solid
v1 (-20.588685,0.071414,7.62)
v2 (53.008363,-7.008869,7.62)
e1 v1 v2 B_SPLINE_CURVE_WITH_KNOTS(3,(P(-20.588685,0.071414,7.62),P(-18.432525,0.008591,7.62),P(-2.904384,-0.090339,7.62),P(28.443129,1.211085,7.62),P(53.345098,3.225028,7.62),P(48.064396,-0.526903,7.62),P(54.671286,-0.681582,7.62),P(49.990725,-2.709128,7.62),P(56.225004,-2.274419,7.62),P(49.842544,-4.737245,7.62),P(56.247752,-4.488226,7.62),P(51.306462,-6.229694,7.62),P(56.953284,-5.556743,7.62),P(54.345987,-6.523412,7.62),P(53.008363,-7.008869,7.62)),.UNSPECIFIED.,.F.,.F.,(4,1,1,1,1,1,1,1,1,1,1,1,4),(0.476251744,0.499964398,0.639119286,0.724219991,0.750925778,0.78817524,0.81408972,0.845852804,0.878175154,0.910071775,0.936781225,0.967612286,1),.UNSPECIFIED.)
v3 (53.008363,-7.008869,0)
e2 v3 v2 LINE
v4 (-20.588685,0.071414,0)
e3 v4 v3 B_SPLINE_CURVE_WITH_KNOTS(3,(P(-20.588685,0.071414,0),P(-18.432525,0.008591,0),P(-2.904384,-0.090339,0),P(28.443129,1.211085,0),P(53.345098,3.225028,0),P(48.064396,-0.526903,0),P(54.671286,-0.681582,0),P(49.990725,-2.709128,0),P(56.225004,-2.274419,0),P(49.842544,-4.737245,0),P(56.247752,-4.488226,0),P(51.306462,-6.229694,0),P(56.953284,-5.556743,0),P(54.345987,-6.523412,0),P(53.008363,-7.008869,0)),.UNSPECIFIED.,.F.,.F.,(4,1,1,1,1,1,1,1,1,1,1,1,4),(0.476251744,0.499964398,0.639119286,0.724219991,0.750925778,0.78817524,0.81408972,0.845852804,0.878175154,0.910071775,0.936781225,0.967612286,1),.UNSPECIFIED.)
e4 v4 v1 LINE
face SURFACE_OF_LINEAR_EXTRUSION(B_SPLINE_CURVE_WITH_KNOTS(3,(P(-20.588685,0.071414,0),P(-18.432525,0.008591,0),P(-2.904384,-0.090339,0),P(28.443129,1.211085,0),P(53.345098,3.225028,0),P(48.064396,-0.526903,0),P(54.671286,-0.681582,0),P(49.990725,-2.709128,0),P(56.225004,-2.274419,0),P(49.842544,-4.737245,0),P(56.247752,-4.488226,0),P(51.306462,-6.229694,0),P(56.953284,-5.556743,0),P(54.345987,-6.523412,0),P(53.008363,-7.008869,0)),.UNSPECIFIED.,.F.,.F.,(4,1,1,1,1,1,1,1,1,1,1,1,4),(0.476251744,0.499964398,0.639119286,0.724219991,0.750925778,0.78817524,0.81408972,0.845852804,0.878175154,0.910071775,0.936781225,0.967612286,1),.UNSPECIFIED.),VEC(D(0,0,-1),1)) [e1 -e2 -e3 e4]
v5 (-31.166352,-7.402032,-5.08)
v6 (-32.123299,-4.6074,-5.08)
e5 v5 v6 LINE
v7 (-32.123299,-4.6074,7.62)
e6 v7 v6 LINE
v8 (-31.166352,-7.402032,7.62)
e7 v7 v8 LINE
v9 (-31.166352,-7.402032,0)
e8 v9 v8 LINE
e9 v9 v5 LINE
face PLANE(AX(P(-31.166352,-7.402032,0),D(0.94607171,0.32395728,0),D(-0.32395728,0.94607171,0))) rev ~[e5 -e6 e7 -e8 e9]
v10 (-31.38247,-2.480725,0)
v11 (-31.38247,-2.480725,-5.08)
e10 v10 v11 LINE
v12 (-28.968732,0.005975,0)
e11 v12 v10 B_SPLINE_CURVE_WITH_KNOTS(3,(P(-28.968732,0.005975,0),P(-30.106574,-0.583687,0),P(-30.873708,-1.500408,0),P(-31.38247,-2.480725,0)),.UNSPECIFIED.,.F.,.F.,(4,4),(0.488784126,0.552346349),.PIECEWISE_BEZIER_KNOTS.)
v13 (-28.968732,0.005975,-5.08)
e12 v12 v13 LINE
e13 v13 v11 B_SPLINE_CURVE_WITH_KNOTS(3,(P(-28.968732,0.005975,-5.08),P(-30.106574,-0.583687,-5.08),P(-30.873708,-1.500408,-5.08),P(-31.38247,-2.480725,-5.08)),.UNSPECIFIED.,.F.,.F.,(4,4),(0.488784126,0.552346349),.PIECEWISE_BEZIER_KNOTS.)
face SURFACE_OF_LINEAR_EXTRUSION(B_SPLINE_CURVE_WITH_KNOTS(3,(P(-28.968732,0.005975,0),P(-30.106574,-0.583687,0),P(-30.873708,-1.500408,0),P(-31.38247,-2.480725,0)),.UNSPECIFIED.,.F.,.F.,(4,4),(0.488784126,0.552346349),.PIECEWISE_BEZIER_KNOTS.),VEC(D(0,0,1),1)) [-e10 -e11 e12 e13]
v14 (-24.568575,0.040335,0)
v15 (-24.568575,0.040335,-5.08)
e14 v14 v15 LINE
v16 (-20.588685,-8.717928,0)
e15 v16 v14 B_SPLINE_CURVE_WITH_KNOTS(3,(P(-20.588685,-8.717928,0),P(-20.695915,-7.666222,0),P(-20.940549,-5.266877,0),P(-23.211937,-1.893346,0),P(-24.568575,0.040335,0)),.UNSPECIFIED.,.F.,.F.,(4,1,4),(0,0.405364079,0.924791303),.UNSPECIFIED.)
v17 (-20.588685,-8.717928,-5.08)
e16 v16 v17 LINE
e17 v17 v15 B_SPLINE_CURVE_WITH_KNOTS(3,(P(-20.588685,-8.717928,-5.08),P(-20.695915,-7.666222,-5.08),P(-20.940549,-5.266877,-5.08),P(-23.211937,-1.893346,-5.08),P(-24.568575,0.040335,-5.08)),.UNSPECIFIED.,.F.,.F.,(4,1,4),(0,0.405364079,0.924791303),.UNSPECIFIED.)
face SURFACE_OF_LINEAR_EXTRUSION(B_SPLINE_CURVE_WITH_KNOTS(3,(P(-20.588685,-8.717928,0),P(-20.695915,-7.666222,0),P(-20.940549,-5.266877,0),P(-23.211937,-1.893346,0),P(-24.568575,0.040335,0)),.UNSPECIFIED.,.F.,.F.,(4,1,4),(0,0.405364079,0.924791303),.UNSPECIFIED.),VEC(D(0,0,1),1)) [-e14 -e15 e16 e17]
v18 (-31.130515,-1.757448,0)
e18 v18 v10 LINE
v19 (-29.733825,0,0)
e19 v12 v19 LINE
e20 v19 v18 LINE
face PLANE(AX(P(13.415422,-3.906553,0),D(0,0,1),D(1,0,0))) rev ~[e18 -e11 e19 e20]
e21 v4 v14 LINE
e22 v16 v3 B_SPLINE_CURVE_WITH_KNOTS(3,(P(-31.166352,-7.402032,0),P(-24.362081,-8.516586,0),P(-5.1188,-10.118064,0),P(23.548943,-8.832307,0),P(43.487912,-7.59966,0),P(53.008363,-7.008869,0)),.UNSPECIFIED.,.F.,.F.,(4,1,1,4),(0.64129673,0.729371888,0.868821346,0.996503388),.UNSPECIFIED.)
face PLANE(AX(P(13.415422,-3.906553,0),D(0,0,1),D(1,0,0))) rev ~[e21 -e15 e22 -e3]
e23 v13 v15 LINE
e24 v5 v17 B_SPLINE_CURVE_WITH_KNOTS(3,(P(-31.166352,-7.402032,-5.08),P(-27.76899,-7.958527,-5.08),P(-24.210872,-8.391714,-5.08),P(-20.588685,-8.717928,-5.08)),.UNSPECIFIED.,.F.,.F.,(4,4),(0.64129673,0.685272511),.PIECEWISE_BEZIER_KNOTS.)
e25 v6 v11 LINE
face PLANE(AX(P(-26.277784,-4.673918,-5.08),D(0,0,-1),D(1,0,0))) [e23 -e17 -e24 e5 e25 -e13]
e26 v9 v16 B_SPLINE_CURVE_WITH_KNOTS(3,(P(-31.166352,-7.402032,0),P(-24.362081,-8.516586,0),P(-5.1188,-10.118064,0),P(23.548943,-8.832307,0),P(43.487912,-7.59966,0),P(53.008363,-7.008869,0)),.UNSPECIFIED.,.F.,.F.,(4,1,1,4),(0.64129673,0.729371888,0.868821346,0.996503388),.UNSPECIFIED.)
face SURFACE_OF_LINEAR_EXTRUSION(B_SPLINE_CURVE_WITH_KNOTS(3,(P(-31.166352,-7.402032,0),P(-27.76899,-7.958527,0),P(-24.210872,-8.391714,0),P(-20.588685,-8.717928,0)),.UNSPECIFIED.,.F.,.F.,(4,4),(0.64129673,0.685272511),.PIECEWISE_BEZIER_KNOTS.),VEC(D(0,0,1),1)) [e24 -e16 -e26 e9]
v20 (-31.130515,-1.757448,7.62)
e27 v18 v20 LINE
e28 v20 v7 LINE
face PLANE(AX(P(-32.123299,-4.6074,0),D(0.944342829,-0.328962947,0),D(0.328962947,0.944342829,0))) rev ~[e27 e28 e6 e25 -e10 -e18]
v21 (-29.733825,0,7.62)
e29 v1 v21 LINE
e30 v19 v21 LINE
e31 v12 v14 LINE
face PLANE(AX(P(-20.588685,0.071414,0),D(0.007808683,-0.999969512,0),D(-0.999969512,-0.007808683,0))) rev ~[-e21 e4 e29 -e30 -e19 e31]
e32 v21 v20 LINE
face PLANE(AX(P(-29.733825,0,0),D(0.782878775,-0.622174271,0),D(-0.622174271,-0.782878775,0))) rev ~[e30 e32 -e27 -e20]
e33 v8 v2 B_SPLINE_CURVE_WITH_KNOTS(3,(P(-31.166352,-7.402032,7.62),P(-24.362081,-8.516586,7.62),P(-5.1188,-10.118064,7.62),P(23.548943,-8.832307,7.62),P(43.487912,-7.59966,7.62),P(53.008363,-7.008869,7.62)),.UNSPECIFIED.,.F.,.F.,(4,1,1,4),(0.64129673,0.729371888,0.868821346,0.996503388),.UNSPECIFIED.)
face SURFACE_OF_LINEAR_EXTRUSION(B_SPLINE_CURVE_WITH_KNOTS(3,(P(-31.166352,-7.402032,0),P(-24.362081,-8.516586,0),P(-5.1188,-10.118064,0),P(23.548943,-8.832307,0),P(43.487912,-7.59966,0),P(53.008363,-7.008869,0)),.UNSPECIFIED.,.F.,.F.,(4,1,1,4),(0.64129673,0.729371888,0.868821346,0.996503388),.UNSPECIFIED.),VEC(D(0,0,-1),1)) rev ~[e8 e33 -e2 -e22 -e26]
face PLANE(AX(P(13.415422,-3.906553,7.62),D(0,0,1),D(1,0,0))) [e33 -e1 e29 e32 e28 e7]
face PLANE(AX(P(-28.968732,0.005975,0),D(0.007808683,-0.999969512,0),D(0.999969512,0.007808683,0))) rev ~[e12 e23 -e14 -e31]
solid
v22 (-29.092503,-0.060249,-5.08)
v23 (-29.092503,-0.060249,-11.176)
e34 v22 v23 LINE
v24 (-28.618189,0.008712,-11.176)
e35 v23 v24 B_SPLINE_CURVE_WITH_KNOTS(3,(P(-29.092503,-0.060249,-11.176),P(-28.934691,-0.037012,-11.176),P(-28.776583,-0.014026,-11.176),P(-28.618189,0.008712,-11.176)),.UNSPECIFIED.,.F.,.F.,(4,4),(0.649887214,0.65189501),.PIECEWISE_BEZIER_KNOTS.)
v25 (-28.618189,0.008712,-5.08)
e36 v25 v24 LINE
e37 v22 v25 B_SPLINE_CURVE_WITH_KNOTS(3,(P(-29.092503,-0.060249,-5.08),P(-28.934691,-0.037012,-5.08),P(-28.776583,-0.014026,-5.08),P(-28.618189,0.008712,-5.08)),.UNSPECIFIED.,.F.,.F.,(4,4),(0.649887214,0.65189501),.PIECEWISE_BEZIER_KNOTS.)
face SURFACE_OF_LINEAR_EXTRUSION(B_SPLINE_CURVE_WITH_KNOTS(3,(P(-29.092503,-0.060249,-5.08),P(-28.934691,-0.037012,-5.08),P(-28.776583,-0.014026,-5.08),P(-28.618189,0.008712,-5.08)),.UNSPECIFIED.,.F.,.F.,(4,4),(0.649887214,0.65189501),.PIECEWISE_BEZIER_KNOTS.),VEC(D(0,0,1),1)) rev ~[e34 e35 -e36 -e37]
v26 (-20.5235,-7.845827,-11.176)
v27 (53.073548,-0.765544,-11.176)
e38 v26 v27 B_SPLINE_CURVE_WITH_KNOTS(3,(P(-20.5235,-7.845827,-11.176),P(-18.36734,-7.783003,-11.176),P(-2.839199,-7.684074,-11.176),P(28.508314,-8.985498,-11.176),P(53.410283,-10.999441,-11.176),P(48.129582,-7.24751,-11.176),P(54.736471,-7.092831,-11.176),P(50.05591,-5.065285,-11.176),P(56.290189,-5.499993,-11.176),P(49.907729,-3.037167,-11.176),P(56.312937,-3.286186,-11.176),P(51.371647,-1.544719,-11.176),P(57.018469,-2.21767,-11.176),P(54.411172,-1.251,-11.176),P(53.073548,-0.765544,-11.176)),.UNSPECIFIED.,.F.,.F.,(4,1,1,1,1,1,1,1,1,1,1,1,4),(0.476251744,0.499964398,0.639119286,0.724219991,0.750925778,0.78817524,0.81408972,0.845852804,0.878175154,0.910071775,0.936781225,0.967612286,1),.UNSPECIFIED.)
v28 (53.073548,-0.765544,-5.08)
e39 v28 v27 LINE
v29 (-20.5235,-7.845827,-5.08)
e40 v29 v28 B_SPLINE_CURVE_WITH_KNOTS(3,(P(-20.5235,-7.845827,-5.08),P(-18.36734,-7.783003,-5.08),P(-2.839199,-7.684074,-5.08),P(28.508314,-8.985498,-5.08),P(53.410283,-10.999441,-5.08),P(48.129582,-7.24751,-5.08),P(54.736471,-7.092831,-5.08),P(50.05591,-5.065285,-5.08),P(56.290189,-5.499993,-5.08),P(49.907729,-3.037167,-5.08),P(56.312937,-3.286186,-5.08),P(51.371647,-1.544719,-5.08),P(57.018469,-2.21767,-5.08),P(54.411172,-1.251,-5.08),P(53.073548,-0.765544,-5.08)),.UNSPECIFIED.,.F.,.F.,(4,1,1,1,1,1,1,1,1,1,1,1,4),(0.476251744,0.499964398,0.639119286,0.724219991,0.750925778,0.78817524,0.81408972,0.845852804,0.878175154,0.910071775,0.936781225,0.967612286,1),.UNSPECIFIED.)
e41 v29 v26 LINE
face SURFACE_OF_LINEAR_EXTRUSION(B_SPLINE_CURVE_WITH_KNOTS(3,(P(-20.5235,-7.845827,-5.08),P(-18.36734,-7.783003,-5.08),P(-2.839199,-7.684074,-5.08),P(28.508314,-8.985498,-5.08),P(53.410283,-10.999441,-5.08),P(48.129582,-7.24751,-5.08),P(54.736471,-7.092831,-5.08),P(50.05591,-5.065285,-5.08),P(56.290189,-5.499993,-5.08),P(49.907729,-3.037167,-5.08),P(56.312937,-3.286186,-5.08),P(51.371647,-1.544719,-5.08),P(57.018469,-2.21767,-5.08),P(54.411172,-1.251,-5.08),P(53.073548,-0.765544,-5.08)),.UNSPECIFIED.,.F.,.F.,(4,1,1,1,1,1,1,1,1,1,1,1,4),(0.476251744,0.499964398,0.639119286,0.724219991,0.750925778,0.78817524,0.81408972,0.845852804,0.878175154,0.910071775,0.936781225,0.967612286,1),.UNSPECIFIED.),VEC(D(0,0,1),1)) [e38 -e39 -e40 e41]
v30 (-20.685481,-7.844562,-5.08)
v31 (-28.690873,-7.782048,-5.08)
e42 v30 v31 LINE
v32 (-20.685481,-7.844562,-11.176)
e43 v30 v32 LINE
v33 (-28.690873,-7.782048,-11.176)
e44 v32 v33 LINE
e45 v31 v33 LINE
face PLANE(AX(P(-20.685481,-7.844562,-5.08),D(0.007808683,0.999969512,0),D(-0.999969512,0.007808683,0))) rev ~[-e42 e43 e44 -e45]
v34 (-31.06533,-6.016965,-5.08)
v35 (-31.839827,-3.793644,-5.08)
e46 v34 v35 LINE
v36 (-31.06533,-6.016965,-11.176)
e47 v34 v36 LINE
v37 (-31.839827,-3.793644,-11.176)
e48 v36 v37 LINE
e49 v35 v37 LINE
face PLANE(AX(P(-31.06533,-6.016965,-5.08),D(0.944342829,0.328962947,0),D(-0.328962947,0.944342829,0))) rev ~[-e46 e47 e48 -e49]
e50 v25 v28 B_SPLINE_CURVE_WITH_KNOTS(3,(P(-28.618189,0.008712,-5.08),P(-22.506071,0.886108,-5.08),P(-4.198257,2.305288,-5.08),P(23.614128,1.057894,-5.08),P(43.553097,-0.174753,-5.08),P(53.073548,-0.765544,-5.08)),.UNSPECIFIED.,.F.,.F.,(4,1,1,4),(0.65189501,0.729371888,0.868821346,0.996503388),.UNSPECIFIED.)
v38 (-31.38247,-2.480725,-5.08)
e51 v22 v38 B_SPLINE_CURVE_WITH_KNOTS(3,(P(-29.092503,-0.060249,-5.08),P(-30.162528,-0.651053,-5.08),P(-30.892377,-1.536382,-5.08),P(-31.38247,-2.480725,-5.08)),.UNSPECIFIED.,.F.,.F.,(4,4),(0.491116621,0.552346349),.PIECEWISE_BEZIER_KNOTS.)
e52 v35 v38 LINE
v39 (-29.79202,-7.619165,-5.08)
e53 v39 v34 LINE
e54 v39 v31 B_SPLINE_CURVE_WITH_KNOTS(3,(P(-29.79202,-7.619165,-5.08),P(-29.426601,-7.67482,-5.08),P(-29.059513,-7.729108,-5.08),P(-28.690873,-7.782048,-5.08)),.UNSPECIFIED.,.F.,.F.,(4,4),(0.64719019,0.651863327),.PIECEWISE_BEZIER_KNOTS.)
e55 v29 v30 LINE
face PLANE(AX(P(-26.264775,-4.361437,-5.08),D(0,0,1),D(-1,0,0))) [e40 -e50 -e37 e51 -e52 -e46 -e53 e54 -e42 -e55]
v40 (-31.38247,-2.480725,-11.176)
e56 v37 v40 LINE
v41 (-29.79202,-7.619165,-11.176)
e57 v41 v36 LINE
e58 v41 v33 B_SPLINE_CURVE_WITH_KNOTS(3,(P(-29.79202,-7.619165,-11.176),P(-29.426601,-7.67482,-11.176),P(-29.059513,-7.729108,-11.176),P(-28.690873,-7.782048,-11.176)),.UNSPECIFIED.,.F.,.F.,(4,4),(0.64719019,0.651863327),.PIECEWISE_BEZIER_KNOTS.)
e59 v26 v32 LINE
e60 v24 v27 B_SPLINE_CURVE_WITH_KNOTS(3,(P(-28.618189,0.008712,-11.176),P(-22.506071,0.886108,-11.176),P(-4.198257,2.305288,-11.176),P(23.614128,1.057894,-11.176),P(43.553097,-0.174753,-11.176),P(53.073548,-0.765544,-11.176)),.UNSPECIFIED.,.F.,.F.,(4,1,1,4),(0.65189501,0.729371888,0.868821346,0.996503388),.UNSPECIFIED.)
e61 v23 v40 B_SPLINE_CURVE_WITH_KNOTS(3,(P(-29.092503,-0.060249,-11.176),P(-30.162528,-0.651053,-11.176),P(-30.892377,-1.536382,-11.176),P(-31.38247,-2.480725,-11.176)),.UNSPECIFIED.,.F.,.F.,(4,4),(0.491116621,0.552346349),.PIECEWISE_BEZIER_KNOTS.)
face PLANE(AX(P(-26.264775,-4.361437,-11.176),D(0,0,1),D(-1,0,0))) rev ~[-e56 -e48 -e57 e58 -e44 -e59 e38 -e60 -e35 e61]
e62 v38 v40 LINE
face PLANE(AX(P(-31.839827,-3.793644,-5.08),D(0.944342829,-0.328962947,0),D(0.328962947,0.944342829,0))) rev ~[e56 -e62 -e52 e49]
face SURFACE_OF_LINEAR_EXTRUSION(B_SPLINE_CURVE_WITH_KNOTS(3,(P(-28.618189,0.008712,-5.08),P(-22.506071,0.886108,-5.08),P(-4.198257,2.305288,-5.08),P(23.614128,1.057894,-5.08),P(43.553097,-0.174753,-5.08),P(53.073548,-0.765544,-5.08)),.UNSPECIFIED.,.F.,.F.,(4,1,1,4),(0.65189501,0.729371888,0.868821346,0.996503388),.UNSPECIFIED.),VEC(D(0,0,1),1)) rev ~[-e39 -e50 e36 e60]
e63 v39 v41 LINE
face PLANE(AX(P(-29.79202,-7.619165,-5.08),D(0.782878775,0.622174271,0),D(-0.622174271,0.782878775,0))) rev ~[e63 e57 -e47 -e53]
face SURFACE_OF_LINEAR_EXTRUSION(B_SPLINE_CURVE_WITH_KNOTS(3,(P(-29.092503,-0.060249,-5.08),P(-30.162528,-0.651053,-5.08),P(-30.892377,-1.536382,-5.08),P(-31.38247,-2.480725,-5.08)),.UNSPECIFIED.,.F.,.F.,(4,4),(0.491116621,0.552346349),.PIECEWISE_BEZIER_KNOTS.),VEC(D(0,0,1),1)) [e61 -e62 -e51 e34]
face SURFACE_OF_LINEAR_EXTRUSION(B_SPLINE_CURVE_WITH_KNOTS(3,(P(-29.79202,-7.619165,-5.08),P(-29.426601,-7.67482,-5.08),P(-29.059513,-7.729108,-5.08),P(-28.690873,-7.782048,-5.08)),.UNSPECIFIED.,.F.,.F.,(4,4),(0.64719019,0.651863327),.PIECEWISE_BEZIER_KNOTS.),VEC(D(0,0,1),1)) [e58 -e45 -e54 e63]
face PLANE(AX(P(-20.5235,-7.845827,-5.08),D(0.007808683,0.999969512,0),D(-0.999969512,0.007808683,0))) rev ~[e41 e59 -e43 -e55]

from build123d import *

# Parameters (mm, degrees)
F1_DEPTH = 7.62
F3_DEPTH = 5.08
F5_DEPTH = 6.096


with BuildPart() as f1:
    # F0 (on Top) → F1 (new body)
    with BuildSketch(Plane.XY):
        with BuildLine():
            Line((-32.1232994972, -4.6074000446), (-31.1663517222, -7.402031539))
            add(Edge.make_bspline(
                [(-31.1663517222, -7.402031539), (-24.3620805414, -8.516586495), (-5.1188000961, -10.1180637513), (23.5489427366, -8.8323068142), (43.4879123536, -7.5996602354), (53.0083630423, -7.0088685962)],
                knots=[0.6412967297, 0.6412967297, 0.6412967297, 0.6412967297, 0.7293718882, 0.8688213456, 0.9965033878, 0.9965033878, 0.9965033878, 0.9965033878], degree=3))
            add(Edge.make_bspline(
                [(-20.5886847274, 0.0714136867), (-18.4325246492, 0.0085905521), (-2.904384168, -0.0903390189), (28.4431286792, 1.2110854268), (53.3450981726, 3.225027955), (48.0643964884, -0.5269030489), (54.671286243, -0.6815816974), (49.990725038, -2.7091281295), (56.2250035708, -2.2744194982), (49.8425443069, -4.7372453658), (56.2477520114, -4.4882263671), (51.3064623402, -6.2296941136), (56.9532836508, -5.5567427397), (54.34598679, -6.5234124491), (53.0083630423, -7.0088685962)],
                knots=[0.4762517442, 0.4762517442, 0.4762517442, 0.4762517442, 0.4999643977, 0.6391192862, 0.7242199913, 0.7509257777, 0.7881752399, 0.8140897202, 0.8458528044, 0.8781751537, 0.9100717752, 0.9367812247, 0.9676122856, 1, 1, 1, 1], degree=3))
            Line((-20.5886847274, 0.0714136867), (-29.733825475, 0))
            Line((-29.733825475, 0), (-31.1305152205, -1.7574477268))
            Line((-31.1305152205, -1.7574477268), (-32.1232994972, -4.6074000446))
        make_face()
    extrude(amount=F1_DEPTH)

    # F2 (on face) → F3 (join)
    with BuildSketch(Plane(origin=(0, 0, 0), x_dir=(1, 0, 0), z_dir=(0, 0, -1))):
        with BuildLine():
            Line((-31.1663517222, 7.402031539), (-32.1232994972, 4.6074000446))
            Line((-32.1232994972, 4.6074000446), (-31.3824697288, 2.4807250306))
            add(Edge.make_bspline(
                [(-28.9687315599, -0.0059745584), (-30.1065744803, 0.5836866376), (-30.8737077287, 1.5004076818), (-31.3824697288, 2.4807250306)],
                knots=[0.4887841261, 0.4887841261, 0.4887841261, 0.4887841261, 0.5523463493, 0.5523463493, 0.5523463493, 0.5523463493], degree=3))
            Line((-28.9687315599, -0.0059745584), (-24.5685748837, -0.0403350367))
            add(Edge.make_bspline(
                [(-20.5886847274, 8.7179279132), (-20.6959150874, 7.6662220966), (-20.9405487627, 5.2668768071), (-23.2119366173, 1.8933456436), (-24.5685748837, -0.0403350367)],
                knots=[0, 0, 0, 0, 0.4053640786, 0.924791303, 0.924791303, 0.924791303, 0.924791303], degree=3))
            add(Edge.make_bspline(
                [(-31.1663517222, 7.402031539), (-27.768990322, 7.9585269939), (-24.2108723521, 8.3917141444), (-20.5886847274, 8.7179279132)],
                knots=[0.6412967297, 0.6412967297, 0.6412967297, 0.6412967297, 0.6852725114, 0.6852725114, 0.6852725114, 0.6852725114], degree=3))
        make_face()
    extrude(amount=F3_DEPTH)


with BuildPart() as f5:
    # F4 (on face) → F5 (new body)
    with BuildSketch(Plane(origin=(0, 0, -5.08), x_dir=(1, 0, 0), z_dir=(0, 0, -1))):
        with BuildLine():
            add(Edge.make_bspline(
                [(-29.0925031999, 0.0602487535), (-30.1625283777, 0.6510527228), (-30.8923773853, 1.5363816503), (-31.3824697288, 2.4807250306)],
                knots=[0.4911166212, 0.4911166212, 0.4911166212, 0.4911166212, 0.5523463493, 0.5523463493, 0.5523463493, 0.5523463493], degree=3))
            add(Edge.make_bspline(
                [(-29.0925031999, 0.0602487535), (-28.9346911942, 0.0370119911), (-28.776583455, 0.0140256194), (-28.6181891843, -0.0087119163)],
                knots=[0.6498872135, 0.6498872135, 0.6498872135, 0.6498872135, 0.6518950105, 0.6518950105, 0.6518950105, 0.6518950105], degree=3))
            Line((-28.6181891843, -0.0087119163), (-24.5685748837, -0.0403350367))
            add(Edge.make_bspline(
                [(-20.685481243, 7.8445616496), (-20.7845843132, 7.0723755723), (-21.2149092951, 4.8593885816), (-23.2119366173, 1.8933456436), (-24.5685748837, -0.0403350367)],
                knots=[0.111705376, 0.111705376, 0.111705376, 0.111705376, 0.4053640786, 0.924791303, 0.924791303, 0.924791303, 0.924791303], degree=3))
            Line((-20.685481243, 7.8445616496), (-28.6908726534, 7.782048176))
            add(Edge.make_bspline(
                [(-29.7920200182, 7.619164839), (-29.4266012407, 7.6748204882), (-29.059513444, 7.7291083999), (-28.6908726534, 7.782048176)],
                knots=[0.6471901897, 0.6471901897, 0.6471901897, 0.6471901897, 0.6518633268, 0.6518633268, 0.6518633268, 0.6518633268], degree=3))
            Line((-29.7920200182, 7.619164839), (-31.0653300909, 6.016965138))
            Line((-31.0653300909, 6.016965138), (-31.8398266317, 3.7936440565))
            Line((-31.8398266317, 3.7936440565), (-31.3824697288, 2.4807250306))
        make_face()
        with BuildLine():
            Line((-24.5685748837, -0.0403350367), (-28.6181891843, -0.0087119163))
            add(Edge.make_bspline(
                [(-28.6181891843, -0.0087119163), (-22.5060705197, -0.8861080217), (-4.1982571595, -2.3052878302), (23.6141278662, -1.0578939494), (43.5530974832, 0.1747526294), (53.0735481719, 0.7655442686)],
                knots=[0.6518950105, 0.6518950105, 0.6518950105, 0.6518950105, 0.7293718882, 0.8688213456, 0.9965033878, 0.9965033878, 0.9965033878, 0.9965033878], degree=3))
            add(Edge.make_bspline(
                [(-20.5234995978, 7.8458265515), (-18.3673395195, 7.7830034169), (-2.8391990384, 7.6840738459), (28.5083138088, 8.9854982916), (53.4102833022, 10.9994408198), (48.129581618, 7.2475098159), (54.7364713727, 7.0928311674), (50.0559101676, 5.0652847353), (56.2901887005, 5.4999933666), (49.9077294366, 3.037167499), (56.3129371411, 3.2861864977), (51.3716474698, 1.5447187512), (57.0184687805, 2.2176701251), (54.4111719196, 1.2510004157), (53.0735481719, 0.7655442686)],
                knots=[0.4762517442, 0.4762517442, 0.4762517442, 0.4762517442, 0.4999643977, 0.6391192862, 0.7242199913, 0.7509257777, 0.7881752399, 0.8140897202, 0.8458528044, 0.8781751537, 0.9100717752, 0.9367812247, 0.9676122856, 1, 1, 1, 1], degree=3))
            Line((-20.5234995978, 7.8458265515), (-20.685481243, 7.8445616496))
            add(Edge.make_bspline(
                [(-20.685481243, 7.8445616496), (-20.7845843132, 7.0723755723), (-21.2149092951, 4.8593885816), (-23.2119366173, 1.8933456436), (-24.5685748837, -0.0403350367)],
                knots=[0.111705376, 0.111705376, 0.111705376, 0.111705376, 0.4053640786, 0.924791303, 0.924791303, 0.924791303, 0.924791303], degree=3))
        make_face()
    extrude(amount=F5_DEPTH)


solid = Compound([f1.part, f5.part])
